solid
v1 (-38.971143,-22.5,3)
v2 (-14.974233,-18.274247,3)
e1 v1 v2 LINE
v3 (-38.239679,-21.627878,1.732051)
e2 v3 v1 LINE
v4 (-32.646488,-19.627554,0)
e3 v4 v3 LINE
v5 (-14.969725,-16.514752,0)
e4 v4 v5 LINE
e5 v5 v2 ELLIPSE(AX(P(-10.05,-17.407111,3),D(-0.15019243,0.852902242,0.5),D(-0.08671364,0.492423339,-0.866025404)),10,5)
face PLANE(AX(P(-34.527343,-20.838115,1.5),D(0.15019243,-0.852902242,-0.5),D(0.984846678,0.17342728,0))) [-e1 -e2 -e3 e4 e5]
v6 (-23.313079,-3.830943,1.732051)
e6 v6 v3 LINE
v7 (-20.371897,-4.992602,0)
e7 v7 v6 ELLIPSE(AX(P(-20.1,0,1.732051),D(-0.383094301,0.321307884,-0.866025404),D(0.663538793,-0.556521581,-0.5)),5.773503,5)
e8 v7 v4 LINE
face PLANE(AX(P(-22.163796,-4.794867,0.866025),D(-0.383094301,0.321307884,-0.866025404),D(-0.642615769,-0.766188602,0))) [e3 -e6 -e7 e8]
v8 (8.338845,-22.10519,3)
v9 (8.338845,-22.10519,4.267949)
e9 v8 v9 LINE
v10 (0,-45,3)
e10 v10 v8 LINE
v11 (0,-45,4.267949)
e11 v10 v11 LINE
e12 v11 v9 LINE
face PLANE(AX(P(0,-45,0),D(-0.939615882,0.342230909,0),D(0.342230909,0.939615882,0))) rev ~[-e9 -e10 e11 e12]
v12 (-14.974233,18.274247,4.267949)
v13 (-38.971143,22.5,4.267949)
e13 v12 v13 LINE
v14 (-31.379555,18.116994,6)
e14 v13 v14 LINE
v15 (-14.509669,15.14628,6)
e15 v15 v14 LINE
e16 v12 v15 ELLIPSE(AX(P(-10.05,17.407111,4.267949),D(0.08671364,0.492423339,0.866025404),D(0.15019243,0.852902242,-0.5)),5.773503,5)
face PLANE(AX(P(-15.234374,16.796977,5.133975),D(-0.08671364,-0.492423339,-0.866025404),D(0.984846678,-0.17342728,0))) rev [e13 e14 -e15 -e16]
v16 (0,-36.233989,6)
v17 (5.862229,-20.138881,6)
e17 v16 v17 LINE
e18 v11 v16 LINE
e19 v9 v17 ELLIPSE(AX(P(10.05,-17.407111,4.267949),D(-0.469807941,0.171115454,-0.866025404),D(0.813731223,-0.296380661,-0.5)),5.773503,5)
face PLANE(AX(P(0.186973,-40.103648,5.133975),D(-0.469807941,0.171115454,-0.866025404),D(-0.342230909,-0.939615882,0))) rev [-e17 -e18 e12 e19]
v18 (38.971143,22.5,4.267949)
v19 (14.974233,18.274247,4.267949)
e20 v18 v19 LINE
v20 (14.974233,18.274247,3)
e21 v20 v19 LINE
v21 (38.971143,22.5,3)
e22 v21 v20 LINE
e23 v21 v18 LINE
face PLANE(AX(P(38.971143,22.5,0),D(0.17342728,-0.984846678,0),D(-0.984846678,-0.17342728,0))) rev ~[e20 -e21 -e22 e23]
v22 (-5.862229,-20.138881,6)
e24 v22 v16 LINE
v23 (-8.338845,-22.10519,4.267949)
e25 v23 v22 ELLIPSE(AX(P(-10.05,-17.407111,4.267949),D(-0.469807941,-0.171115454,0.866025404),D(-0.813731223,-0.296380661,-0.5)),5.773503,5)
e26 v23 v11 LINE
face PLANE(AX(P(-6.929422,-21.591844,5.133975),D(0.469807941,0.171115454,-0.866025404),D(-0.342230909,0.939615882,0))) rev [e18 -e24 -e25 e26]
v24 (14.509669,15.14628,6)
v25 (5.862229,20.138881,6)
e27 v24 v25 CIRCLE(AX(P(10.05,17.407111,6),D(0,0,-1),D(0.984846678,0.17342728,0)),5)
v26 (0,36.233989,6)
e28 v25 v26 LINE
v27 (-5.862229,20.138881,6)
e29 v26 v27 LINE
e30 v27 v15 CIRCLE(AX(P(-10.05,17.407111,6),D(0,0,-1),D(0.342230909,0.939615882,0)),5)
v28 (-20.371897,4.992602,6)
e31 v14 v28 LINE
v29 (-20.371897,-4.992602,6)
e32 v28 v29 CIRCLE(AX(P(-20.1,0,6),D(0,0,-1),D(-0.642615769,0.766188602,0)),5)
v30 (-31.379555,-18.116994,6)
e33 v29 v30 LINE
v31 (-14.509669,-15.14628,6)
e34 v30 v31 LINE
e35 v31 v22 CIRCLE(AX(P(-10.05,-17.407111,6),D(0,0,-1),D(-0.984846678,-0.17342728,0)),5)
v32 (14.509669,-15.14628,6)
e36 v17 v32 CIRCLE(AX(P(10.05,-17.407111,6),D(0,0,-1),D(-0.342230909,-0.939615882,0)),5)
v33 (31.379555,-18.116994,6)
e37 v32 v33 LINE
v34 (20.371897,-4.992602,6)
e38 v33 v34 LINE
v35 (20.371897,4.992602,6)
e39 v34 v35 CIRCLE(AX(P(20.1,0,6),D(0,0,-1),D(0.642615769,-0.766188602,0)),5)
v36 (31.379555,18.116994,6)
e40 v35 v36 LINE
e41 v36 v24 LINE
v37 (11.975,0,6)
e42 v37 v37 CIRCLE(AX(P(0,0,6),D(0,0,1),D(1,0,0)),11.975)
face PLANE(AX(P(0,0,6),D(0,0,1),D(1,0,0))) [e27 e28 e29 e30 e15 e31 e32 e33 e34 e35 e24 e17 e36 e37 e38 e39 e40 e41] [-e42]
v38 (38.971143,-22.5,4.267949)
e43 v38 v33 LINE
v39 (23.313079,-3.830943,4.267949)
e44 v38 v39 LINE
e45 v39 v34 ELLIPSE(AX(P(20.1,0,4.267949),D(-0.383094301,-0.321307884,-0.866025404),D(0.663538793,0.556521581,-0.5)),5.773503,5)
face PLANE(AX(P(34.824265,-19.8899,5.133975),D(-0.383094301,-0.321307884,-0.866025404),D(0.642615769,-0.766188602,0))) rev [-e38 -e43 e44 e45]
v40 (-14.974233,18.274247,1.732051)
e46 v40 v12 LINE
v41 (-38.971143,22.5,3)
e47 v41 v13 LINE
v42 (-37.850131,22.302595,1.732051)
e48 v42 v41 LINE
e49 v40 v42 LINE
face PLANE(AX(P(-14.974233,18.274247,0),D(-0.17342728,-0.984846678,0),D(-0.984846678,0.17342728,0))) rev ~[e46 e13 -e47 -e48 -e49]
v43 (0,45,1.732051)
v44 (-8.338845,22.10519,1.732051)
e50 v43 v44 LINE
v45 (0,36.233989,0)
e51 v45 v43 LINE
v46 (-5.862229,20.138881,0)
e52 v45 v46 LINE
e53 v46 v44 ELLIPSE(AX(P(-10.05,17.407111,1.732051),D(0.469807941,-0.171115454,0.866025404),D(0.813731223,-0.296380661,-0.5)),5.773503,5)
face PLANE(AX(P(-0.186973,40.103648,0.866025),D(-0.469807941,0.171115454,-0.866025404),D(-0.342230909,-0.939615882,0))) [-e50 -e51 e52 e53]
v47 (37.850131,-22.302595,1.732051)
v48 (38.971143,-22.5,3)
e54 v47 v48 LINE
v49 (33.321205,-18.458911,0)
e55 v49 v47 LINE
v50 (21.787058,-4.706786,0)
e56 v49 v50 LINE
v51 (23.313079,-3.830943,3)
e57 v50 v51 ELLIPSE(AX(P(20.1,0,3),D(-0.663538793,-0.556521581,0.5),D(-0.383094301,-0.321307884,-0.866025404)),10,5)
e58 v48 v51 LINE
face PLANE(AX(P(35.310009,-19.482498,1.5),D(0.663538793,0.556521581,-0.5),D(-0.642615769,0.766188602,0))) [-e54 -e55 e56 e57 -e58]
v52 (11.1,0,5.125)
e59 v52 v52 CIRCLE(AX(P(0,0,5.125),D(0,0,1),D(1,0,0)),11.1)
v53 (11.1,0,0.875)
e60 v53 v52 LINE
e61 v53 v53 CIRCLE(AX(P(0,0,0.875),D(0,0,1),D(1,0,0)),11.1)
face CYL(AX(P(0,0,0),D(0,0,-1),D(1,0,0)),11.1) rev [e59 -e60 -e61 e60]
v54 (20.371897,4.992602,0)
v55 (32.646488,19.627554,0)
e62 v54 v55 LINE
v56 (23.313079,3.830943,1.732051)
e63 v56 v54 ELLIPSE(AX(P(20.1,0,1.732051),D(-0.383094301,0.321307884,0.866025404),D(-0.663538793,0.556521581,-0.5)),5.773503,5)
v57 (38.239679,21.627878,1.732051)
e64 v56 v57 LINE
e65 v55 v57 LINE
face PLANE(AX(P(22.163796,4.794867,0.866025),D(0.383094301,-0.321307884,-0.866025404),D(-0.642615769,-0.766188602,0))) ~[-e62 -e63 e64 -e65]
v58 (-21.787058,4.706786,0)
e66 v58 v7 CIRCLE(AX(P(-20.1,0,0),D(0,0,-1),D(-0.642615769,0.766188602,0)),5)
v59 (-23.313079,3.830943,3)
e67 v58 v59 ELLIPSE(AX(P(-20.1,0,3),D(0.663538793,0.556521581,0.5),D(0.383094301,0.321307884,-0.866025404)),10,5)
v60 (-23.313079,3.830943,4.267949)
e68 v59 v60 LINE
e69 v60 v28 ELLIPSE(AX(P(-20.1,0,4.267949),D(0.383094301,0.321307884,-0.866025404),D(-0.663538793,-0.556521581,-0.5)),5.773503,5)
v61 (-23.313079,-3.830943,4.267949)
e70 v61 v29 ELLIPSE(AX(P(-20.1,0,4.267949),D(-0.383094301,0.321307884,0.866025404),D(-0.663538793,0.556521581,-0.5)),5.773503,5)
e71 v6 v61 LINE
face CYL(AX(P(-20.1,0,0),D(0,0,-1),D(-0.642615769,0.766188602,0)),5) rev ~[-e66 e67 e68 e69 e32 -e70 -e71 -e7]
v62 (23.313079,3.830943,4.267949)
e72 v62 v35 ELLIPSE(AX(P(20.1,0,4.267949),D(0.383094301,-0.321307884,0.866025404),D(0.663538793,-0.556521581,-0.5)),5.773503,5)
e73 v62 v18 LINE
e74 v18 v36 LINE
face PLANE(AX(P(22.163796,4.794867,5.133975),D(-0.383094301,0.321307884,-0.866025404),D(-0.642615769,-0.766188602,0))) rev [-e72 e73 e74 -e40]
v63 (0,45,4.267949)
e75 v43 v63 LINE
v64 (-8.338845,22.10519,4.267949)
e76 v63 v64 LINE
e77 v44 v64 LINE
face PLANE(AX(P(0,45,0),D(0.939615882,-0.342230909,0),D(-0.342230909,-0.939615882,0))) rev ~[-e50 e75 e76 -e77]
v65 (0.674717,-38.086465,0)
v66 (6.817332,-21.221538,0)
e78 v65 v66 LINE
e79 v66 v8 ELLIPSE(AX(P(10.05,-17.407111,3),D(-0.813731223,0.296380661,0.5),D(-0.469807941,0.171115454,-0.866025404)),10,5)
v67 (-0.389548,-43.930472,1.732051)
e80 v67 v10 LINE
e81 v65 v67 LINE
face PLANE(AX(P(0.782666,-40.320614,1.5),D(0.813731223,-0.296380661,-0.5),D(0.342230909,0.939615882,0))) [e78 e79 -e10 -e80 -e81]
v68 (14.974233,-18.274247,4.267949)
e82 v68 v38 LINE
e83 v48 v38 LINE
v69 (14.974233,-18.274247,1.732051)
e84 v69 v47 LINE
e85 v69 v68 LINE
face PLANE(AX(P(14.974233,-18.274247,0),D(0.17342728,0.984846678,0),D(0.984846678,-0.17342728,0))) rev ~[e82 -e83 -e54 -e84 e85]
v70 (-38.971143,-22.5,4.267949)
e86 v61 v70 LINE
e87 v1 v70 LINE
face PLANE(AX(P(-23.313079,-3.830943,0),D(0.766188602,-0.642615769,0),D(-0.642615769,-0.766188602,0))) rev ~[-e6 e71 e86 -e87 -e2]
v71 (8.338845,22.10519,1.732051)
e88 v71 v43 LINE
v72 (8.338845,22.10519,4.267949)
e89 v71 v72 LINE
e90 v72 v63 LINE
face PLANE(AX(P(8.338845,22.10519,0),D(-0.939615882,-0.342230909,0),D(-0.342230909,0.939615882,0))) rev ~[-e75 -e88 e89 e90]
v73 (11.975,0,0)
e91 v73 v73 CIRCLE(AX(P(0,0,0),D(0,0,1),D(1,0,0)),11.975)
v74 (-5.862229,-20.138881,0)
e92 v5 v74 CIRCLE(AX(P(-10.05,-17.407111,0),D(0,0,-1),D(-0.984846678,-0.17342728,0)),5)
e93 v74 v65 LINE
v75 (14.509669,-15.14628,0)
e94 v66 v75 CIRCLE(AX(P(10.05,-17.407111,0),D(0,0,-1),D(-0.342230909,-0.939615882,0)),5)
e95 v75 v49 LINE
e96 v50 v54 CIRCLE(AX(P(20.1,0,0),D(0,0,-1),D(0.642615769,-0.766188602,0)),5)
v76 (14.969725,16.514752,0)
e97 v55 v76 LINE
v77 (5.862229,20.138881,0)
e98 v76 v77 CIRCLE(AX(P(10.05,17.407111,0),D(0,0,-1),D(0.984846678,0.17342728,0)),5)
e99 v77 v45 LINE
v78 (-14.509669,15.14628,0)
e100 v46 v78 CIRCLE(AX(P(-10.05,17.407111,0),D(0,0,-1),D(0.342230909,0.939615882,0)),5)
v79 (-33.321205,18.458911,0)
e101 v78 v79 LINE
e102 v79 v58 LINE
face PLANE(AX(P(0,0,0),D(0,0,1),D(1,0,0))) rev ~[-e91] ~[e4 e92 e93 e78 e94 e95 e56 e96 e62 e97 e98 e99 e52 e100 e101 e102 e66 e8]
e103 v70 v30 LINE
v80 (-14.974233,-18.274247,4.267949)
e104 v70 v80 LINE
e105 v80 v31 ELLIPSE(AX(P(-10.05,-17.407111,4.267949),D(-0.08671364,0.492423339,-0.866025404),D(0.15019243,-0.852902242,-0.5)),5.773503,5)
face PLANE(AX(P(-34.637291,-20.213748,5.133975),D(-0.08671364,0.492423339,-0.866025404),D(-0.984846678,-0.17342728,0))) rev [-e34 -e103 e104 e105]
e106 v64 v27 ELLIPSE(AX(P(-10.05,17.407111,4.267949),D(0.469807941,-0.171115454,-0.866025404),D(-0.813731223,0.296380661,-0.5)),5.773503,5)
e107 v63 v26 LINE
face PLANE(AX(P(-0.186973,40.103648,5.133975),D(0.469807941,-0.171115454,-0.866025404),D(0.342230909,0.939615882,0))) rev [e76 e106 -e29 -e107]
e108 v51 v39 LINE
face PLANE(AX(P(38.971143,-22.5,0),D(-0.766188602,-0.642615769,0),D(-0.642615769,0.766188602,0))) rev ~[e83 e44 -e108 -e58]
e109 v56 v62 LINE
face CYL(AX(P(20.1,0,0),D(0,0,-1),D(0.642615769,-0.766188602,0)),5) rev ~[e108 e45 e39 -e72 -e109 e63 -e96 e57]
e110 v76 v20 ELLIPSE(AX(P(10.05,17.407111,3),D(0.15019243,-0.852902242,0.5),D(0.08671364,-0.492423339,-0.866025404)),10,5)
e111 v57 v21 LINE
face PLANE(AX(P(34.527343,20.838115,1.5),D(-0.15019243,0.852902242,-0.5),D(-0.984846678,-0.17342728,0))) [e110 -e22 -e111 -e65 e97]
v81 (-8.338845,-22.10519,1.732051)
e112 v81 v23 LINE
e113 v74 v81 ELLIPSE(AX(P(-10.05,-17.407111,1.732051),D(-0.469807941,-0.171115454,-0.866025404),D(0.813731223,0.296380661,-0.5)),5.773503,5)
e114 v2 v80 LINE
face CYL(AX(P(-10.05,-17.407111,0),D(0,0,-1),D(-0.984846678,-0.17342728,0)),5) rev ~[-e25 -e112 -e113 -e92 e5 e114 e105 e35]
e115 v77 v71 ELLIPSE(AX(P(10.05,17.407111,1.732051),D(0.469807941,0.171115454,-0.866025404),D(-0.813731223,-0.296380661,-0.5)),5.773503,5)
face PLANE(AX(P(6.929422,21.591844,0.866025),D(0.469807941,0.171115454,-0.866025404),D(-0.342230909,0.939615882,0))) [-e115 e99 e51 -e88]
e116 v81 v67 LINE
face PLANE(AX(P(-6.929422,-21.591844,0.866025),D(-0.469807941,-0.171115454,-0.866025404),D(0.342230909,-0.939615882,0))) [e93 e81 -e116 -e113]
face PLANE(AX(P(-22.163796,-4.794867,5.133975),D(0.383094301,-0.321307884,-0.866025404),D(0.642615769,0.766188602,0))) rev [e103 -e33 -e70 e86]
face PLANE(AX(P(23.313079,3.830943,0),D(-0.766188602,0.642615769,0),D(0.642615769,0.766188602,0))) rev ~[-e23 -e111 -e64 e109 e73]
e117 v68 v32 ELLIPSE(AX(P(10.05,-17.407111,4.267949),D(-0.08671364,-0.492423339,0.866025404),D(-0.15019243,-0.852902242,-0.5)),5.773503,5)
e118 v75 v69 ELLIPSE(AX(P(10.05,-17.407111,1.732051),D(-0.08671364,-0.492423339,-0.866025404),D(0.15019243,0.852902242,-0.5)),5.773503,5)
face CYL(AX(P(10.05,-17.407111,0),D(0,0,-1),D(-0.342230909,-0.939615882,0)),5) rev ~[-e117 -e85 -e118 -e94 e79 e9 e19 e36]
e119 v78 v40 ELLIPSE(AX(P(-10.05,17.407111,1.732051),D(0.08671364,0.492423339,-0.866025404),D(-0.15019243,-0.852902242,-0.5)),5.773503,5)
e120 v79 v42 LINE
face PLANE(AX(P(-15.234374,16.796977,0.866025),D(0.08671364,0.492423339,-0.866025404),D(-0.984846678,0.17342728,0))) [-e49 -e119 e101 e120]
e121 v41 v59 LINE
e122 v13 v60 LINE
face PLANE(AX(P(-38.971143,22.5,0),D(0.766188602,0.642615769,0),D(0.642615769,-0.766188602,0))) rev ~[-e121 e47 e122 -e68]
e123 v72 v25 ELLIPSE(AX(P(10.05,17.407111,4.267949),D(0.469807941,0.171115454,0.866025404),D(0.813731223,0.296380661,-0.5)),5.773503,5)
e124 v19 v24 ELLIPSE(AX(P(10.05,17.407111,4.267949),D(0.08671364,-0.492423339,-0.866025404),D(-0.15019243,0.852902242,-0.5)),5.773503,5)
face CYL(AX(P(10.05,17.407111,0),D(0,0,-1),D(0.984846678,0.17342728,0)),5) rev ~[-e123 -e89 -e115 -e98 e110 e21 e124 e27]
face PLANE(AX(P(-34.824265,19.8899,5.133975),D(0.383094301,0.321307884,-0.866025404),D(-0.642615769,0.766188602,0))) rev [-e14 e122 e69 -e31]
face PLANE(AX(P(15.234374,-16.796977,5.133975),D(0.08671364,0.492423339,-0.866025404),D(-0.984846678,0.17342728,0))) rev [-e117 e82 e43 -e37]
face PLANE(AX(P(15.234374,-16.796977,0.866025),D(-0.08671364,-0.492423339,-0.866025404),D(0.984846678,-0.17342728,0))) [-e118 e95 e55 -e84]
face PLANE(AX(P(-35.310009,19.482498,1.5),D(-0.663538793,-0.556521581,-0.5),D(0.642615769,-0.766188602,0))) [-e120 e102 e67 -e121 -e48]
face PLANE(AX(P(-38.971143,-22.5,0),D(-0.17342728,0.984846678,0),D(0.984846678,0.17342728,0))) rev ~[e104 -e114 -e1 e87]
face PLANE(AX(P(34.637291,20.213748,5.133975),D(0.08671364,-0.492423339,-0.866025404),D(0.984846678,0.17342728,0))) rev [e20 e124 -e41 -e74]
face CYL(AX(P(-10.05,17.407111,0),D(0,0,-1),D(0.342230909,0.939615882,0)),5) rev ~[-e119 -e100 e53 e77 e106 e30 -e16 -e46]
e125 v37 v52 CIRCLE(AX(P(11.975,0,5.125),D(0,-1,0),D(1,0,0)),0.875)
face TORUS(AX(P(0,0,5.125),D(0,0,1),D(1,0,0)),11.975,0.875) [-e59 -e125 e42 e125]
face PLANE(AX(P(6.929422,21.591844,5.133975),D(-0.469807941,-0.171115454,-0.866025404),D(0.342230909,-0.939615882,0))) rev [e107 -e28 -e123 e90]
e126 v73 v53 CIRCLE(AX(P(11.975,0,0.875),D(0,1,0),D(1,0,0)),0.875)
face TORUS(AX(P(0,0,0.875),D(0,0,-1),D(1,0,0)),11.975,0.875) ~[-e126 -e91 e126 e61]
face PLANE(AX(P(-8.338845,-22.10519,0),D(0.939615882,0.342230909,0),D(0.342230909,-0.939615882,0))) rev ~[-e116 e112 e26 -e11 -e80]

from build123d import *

# Parameters (mm, degrees)
F0_R         = 11.1
F1_DEPTH     = 6
F2_C1_SIZE2  = 3
F2_C1_SIZE   = 1.7320508076
F2_C2_SIZE2  = 3
F2_C2_SIZE   = 1.7320508076
F2_C3_SIZE2  = 3
F2_C3_SIZE   = 1.7320508076
F2_C4_SIZE2  = 3
F2_C4_SIZE   = 1.7320508076
F2_C5_SIZE2  = 1.7320508076
F2_C5_SIZE   = 3
F2_C6_SIZE2  = 3
F2_C6_SIZE   = 1.7320508076
F2_C7_SIZE2  = 1.7320508076
F2_C7_SIZE   = 3
F2_C8_SIZE2  = 3
F2_C8_SIZE   = 1.7320508076
F2_C9_SIZE2  = 1.7320508076
F2_C9_SIZE   = 3
F2_C10_SIZE2 = 3
F2_C10_SIZE  = 1.7320508076
F2_C11_SIZE2 = 3
F2_C11_SIZE  = 1.7320508076
F2_C12_SIZE2 = 3
F2_C12_SIZE  = 1.7320508076
F2_C13_SIZE2 = 1.7320508076
F2_C13_SIZE  = 3
F2_C14_SIZE2 = 3
F2_C14_SIZE  = 1.7320508076
F2_C15_SIZE2 = 3
F2_C15_SIZE  = 1.7320508076
F2_C16_SIZE2 = 3
F2_C16_SIZE  = 1.7320508076
F2_C17_SIZE2 = 1.7320508076
F2_C17_SIZE  = 3
F2_C18_SIZE2 = 3
F2_C18_SIZE  = 1.7320508076
F2_C19_SIZE2 = 3
F2_C19_SIZE  = 1.7320508076
F2_C20_SIZE2 = 3
F2_C20_SIZE  = 1.7320508076
F2_C21_SIZE2 = 1.7320508076
F2_C21_SIZE  = 3
F2_C22_SIZE2 = 3
F2_C22_SIZE  = 1.7320508076
F2_C23_SIZE2 = 3
F2_C23_SIZE  = 1.7320508076
F2_C24_SIZE2 = 3
F2_C24_SIZE  = 1.7320508076
F3_R         = 0.875


with BuildPart() as f1:
    # F0 (on Top) → F1 (new body)
    with BuildSketch(Plane.XY):
        with BuildLine():
            Line((8.3388454559, 22.1051900243), (0, 45))
            Line((0, 45), (-8.3388454559, 22.1051900243))
            ThreePointArc((-8.3388454559, 22.1051900243), (-7.55, 13.0769835971), (-14.9742333886, 18.2742470152))
            Line((-14.9742333886, 18.2742470152), (-38.9711431703, 22.5))
            Line((-38.9711431703, 22.5), (-23.3130788445, 3.8309430091))
            ThreePointArc((-23.3130788445, 3.8309430091), (-15.1, 0), (-23.3130788445, -3.8309430091))
            Line((-23.3130788445, -3.8309430091), (-38.9711431703, -22.5))
            Line((-38.9711431703, -22.5), (-14.9742333886, -18.2742470152))
            ThreePointArc((-14.9742333886, -18.2742470152), (-7.55, -13.0769835971), (-8.3388454559, -22.1051900243))
            Line((-8.3388454559, -22.1051900243), (0, -45))
            Line((0, -45), (8.3388454559, -22.1051900243))
            ThreePointArc((8.3388454559, -22.1051900243), (7.55, -13.0769835971), (14.9742333886, -18.2742470152))
            Line((14.9742333886, -18.2742470152), (38.9711431703, -22.5))
            Line((38.9711431703, -22.5), (23.3130788445, -3.8309430091))
            ThreePointArc((23.3130788445, -3.8309430091), (15.1, 0), (23.3130788445, 3.8309430091))
            Line((23.3130788445, 3.8309430091), (38.9711431703, 22.5))
            Line((38.9711431703, 22.5), (14.9742333886, 18.2742470152))
            ThreePointArc((14.9742333886, 18.2742470152), (7.55, 13.0769835971), (8.3388454559, 22.1051900243))
        make_face()
        Circle(F0_R, mode=Mode.SUBTRACT)
    extrude(amount=F1_DEPTH)

    # F2: chamfer of 3 x 1.7320508076 on 24 edges, made by hand

    # F2_c1
    f2_c1_edges = [f1.edges().sort_by_distance(p)[0] for p in [
        (31.1421110074, 13.1654715045, 0),
    ]]
    f2_c1_side = f1.faces().sort_by_distance((31.1421110074, 13.1654715045, 0.0346410162))[0]
    chamfer(f2_c1_edges, length=F2_C1_SIZE, length2=F2_C1_SIZE2, reference=f2_c1_side)

    # F2_c2
    f2_c2_edges = [f1.edges().sort_by_distance(p)[0] for p in [
        (31.1421110074, 13.1654715045, 6),
    ]]
    f2_c2_side = f1.faces().sort_by_distance((31.1421110074, 13.1654715045, 5.9653589838))[0]
    chamfer(f2_c2_edges, length=F2_C2_SIZE, length2=F2_C2_SIZE2, reference=f2_c2_side)

    # F2_c3
    f2_c3_edges = [f1.edges().sort_by_distance(p)[0] for p in [
        (24.6756919125, 19.9826322901, 0),
    ]]
    f2_c3_side = f1.faces().sort_by_distance((24.6816996097, 19.9485162005, 0))[0]
    chamfer(f2_c3_edges, length=F2_C3_SIZE, length2=F2_C3_SIZE2, reference=f2_c3_side)

    # F2_c4
    f2_c4_edges = [f1.edges().sort_by_distance(p)[0] for p in [
        (24.6756919125, 19.9826322901, 6),
    ]]
    f2_c4_side = f1.faces().sort_by_distance((24.6756919125, 19.9826322901, 5.9653589838))[0]
    chamfer(f2_c4_edges, length=F2_C4_SIZE, length2=F2_C4_SIZE2, reference=f2_c4_side)

    # F2_c5
    f2_c5_edges = [f1.edges().sort_by_distance(p)[0] for p in [
        (4.169422728, 33.5525950122, 0),
    ]]
    f2_c5_side = f1.faces().sort_by_distance((4.136873479, 33.5407397857, 0))[0]
    chamfer(f2_c5_edges, length=F2_C5_SIZE, length2=F2_C5_SIZE2, reference=f2_c5_side)

    # F2_c6
    f2_c6_edges = [f1.edges().sort_by_distance(p)[0] for p in [
        (4.169422728, 33.5525950122, 6),
    ]]
    f2_c6_side = f1.faces().sort_by_distance((4.169422728, 33.5525950122, 5.9653589838))[0]
    chamfer(f2_c6_edges, length=F2_C6_SIZE, length2=F2_C6_SIZE2, reference=f2_c6_side)

    # F2_c7
    f2_c7_edges = [f1.edges().sort_by_distance(p)[0] for p in [
        (-4.9676212415, 31.3610921973, 0),
    ]]
    f2_c7_side = f1.faces().sort_by_distance((-4.9350719925, 31.3492369708, 0))[0]
    chamfer(f2_c7_edges, length=F2_C7_SIZE, length2=F2_C7_SIZE2, reference=f2_c7_side)

    # F2_c8
    f2_c8_edges = [f1.edges().sort_by_distance(p)[0] for p in [
        (-4.9676212415, 31.3610921973, 6),
    ]]
    f2_c8_side = f1.faces().sort_by_distance((-4.9676212415, 31.3610921973, 5.9653589838))[0]
    chamfer(f2_c8_edges, length=F2_C8_SIZE, length2=F2_C8_SIZE2, reference=f2_c8_side)

    # F2_c9
    f2_c9_edges = [f1.edges().sort_by_distance(p)[0] for p in [
        (-26.9726882794, 20.3871235076, 0),
    ]]
    f2_c9_side = f1.faces().sort_by_distance((-26.9786959766, 20.353007418, 0))[0]
    chamfer(f2_c9_edges, length=F2_C9_SIZE, length2=F2_C9_SIZE2, reference=f2_c9_side)

    # F2_c10
    f2_c10_edges = [f1.edges().sort_by_distance(p)[0] for p in [
        (-26.9726882794, 20.3871235076, 6),
    ]]
    f2_c10_side = f1.faces().sort_by_distance((-26.9726882794, 20.3871235076, 5.9653589838))[0]
    chamfer(f2_c10_edges, length=F2_C10_SIZE, length2=F2_C10_SIZE2, reference=f2_c10_side)

    # F2_c11
    f2_c11_edges = [f1.edges().sort_by_distance(p)[0] for p in [
        (-29.643313154, 11.3784599071, 0),
    ]]
    f2_c11_side = f1.faces().sort_by_distance((-29.6167716023, 11.4007207704, 0))[0]
    chamfer(f2_c11_edges, length=F2_C11_SIZE, length2=F2_C11_SIZE2, reference=f2_c11_side)

    # F2_c12
    f2_c12_edges = [f1.edges().sort_by_distance(p)[0] for p in [
        (-29.643313154, 11.3784599071, 6),
    ]]
    f2_c12_side = f1.faces().sort_by_distance((-29.643313154, 11.3784599071, 5.9653589838))[0]
    chamfer(f2_c12_edges, length=F2_C12_SIZE, length2=F2_C12_SIZE2, reference=f2_c12_side)

    # F2_c13
    f2_c13_edges = [f1.edges().sort_by_distance(p)[0] for p in [
        (-31.1421110074, -13.1654715045, 0),
    ]]
    f2_c13_side = f1.faces().sort_by_distance((-31.1155694557, -13.1877323678, 0))[0]
    chamfer(f2_c13_edges, length=F2_C13_SIZE, length2=F2_C13_SIZE2, reference=f2_c13_side)

    # F2_c14
    f2_c14_edges = [f1.edges().sort_by_distance(p)[0] for p in [
        (-31.1421110074, -13.1654715045, 6),
    ]]
    f2_c14_side = f1.faces().sort_by_distance((-31.1421110074, -13.1654715045, 5.9653589838))[0]
    chamfer(f2_c14_edges, length=F2_C14_SIZE, length2=F2_C14_SIZE2, reference=f2_c14_side)

    # F2_c15
    f2_c15_edges = [f1.edges().sort_by_distance(p)[0] for p in [
        (-24.6756919125, -19.9826322901, 0),
    ]]
    f2_c15_side = f1.faces().sort_by_distance((-24.6816996097, -19.9485162005, 0))[0]
    chamfer(f2_c15_edges, length=F2_C15_SIZE, length2=F2_C15_SIZE2, reference=f2_c15_side)

    # F2_c16
    f2_c16_edges = [f1.edges().sort_by_distance(p)[0] for p in [
        (-24.6756919125, -19.9826322901, 6),
    ]]
    f2_c16_side = f1.faces().sort_by_distance((-24.6756919125, -19.9826322901, 5.9653589838))[0]
    chamfer(f2_c16_edges, length=F2_C16_SIZE, length2=F2_C16_SIZE2, reference=f2_c16_side)

    # F2_c17
    f2_c17_edges = [f1.edges().sort_by_distance(p)[0] for p in [
        (-4.169422728, -33.5525950122, 0),
    ]]
    f2_c17_side = f1.faces().sort_by_distance((-4.136873479, -33.5407397857, 0))[0]
    chamfer(f2_c17_edges, length=F2_C17_SIZE, length2=F2_C17_SIZE2, reference=f2_c17_side)

    # F2_c18
    f2_c18_edges = [f1.edges().sort_by_distance(p)[0] for p in [
        (-4.169422728, -33.5525950122, 6),
    ]]
    f2_c18_side = f1.faces().sort_by_distance((-4.169422728, -33.5525950122, 5.9653589838))[0]
    chamfer(f2_c18_edges, length=F2_C18_SIZE, length2=F2_C18_SIZE2, reference=f2_c18_side)

    # F2_c19
    f2_c19_edges = [f1.edges().sort_by_distance(p)[0] for p in [
        (4.9676212415, -31.3610921973, 0),
    ]]
    f2_c19_side = f1.faces().sort_by_distance((4.9350719925, -31.3492369708, 0))[0]
    chamfer(f2_c19_edges, length=F2_C19_SIZE, length2=F2_C19_SIZE2, reference=f2_c19_side)

    # F2_c20
    f2_c20_edges = [f1.edges().sort_by_distance(p)[0] for p in [
        (4.9676212415, -31.3610921973, 6),
    ]]
    f2_c20_side = f1.faces().sort_by_distance((4.9676212415, -31.3610921973, 5.9653589838))[0]
    chamfer(f2_c20_edges, length=F2_C20_SIZE, length2=F2_C20_SIZE2, reference=f2_c20_side)

    # F2_c21
    f2_c21_edges = [f1.edges().sort_by_distance(p)[0] for p in [
        (26.9726882794, -20.3871235076, 0),
    ]]
    f2_c21_side = f1.faces().sort_by_distance((26.9786959766, -20.353007418, 0))[0]
    chamfer(f2_c21_edges, length=F2_C21_SIZE, length2=F2_C21_SIZE2, reference=f2_c21_side)

    # F2_c22
    f2_c22_edges = [f1.edges().sort_by_distance(p)[0] for p in [
        (26.9726882794, -20.3871235076, 6),
    ]]
    f2_c22_side = f1.faces().sort_by_distance((26.9726882794, -20.3871235076, 5.9653589838))[0]
    chamfer(f2_c22_edges, length=F2_C22_SIZE, length2=F2_C22_SIZE2, reference=f2_c22_side)

    # F2_c23
    f2_c23_edges = [f1.edges().sort_by_distance(p)[0] for p in [
        (29.643313154, -11.3784599071, 0),
    ]]
    f2_c23_side = f1.faces().sort_by_distance((29.6167716023, -11.4007207704, 0))[0]
    chamfer(f2_c23_edges, length=F2_C23_SIZE, length2=F2_C23_SIZE2, reference=f2_c23_side)

    # F2_c24
    f2_c24_edges = [f1.edges().sort_by_distance(p)[0] for p in [
        (29.643313154, -11.3784599071, 6),
    ]]
    f2_c24_side = f1.faces().sort_by_distance((29.643313154, -11.3784599071, 5.9653589838))[0]
    chamfer(f2_c24_edges, length=F2_C24_SIZE, length2=F2_C24_SIZE2, reference=f2_c24_side)

    # F3
    f3_edges = [f1.edges().sort_by_distance(p)[0] for p in [
        (-11.1, 0, 0),
        (-11.1, 0, 6),
    ]]
    fillet(f3_edges, radius=F3_R)


solid = f1.part
